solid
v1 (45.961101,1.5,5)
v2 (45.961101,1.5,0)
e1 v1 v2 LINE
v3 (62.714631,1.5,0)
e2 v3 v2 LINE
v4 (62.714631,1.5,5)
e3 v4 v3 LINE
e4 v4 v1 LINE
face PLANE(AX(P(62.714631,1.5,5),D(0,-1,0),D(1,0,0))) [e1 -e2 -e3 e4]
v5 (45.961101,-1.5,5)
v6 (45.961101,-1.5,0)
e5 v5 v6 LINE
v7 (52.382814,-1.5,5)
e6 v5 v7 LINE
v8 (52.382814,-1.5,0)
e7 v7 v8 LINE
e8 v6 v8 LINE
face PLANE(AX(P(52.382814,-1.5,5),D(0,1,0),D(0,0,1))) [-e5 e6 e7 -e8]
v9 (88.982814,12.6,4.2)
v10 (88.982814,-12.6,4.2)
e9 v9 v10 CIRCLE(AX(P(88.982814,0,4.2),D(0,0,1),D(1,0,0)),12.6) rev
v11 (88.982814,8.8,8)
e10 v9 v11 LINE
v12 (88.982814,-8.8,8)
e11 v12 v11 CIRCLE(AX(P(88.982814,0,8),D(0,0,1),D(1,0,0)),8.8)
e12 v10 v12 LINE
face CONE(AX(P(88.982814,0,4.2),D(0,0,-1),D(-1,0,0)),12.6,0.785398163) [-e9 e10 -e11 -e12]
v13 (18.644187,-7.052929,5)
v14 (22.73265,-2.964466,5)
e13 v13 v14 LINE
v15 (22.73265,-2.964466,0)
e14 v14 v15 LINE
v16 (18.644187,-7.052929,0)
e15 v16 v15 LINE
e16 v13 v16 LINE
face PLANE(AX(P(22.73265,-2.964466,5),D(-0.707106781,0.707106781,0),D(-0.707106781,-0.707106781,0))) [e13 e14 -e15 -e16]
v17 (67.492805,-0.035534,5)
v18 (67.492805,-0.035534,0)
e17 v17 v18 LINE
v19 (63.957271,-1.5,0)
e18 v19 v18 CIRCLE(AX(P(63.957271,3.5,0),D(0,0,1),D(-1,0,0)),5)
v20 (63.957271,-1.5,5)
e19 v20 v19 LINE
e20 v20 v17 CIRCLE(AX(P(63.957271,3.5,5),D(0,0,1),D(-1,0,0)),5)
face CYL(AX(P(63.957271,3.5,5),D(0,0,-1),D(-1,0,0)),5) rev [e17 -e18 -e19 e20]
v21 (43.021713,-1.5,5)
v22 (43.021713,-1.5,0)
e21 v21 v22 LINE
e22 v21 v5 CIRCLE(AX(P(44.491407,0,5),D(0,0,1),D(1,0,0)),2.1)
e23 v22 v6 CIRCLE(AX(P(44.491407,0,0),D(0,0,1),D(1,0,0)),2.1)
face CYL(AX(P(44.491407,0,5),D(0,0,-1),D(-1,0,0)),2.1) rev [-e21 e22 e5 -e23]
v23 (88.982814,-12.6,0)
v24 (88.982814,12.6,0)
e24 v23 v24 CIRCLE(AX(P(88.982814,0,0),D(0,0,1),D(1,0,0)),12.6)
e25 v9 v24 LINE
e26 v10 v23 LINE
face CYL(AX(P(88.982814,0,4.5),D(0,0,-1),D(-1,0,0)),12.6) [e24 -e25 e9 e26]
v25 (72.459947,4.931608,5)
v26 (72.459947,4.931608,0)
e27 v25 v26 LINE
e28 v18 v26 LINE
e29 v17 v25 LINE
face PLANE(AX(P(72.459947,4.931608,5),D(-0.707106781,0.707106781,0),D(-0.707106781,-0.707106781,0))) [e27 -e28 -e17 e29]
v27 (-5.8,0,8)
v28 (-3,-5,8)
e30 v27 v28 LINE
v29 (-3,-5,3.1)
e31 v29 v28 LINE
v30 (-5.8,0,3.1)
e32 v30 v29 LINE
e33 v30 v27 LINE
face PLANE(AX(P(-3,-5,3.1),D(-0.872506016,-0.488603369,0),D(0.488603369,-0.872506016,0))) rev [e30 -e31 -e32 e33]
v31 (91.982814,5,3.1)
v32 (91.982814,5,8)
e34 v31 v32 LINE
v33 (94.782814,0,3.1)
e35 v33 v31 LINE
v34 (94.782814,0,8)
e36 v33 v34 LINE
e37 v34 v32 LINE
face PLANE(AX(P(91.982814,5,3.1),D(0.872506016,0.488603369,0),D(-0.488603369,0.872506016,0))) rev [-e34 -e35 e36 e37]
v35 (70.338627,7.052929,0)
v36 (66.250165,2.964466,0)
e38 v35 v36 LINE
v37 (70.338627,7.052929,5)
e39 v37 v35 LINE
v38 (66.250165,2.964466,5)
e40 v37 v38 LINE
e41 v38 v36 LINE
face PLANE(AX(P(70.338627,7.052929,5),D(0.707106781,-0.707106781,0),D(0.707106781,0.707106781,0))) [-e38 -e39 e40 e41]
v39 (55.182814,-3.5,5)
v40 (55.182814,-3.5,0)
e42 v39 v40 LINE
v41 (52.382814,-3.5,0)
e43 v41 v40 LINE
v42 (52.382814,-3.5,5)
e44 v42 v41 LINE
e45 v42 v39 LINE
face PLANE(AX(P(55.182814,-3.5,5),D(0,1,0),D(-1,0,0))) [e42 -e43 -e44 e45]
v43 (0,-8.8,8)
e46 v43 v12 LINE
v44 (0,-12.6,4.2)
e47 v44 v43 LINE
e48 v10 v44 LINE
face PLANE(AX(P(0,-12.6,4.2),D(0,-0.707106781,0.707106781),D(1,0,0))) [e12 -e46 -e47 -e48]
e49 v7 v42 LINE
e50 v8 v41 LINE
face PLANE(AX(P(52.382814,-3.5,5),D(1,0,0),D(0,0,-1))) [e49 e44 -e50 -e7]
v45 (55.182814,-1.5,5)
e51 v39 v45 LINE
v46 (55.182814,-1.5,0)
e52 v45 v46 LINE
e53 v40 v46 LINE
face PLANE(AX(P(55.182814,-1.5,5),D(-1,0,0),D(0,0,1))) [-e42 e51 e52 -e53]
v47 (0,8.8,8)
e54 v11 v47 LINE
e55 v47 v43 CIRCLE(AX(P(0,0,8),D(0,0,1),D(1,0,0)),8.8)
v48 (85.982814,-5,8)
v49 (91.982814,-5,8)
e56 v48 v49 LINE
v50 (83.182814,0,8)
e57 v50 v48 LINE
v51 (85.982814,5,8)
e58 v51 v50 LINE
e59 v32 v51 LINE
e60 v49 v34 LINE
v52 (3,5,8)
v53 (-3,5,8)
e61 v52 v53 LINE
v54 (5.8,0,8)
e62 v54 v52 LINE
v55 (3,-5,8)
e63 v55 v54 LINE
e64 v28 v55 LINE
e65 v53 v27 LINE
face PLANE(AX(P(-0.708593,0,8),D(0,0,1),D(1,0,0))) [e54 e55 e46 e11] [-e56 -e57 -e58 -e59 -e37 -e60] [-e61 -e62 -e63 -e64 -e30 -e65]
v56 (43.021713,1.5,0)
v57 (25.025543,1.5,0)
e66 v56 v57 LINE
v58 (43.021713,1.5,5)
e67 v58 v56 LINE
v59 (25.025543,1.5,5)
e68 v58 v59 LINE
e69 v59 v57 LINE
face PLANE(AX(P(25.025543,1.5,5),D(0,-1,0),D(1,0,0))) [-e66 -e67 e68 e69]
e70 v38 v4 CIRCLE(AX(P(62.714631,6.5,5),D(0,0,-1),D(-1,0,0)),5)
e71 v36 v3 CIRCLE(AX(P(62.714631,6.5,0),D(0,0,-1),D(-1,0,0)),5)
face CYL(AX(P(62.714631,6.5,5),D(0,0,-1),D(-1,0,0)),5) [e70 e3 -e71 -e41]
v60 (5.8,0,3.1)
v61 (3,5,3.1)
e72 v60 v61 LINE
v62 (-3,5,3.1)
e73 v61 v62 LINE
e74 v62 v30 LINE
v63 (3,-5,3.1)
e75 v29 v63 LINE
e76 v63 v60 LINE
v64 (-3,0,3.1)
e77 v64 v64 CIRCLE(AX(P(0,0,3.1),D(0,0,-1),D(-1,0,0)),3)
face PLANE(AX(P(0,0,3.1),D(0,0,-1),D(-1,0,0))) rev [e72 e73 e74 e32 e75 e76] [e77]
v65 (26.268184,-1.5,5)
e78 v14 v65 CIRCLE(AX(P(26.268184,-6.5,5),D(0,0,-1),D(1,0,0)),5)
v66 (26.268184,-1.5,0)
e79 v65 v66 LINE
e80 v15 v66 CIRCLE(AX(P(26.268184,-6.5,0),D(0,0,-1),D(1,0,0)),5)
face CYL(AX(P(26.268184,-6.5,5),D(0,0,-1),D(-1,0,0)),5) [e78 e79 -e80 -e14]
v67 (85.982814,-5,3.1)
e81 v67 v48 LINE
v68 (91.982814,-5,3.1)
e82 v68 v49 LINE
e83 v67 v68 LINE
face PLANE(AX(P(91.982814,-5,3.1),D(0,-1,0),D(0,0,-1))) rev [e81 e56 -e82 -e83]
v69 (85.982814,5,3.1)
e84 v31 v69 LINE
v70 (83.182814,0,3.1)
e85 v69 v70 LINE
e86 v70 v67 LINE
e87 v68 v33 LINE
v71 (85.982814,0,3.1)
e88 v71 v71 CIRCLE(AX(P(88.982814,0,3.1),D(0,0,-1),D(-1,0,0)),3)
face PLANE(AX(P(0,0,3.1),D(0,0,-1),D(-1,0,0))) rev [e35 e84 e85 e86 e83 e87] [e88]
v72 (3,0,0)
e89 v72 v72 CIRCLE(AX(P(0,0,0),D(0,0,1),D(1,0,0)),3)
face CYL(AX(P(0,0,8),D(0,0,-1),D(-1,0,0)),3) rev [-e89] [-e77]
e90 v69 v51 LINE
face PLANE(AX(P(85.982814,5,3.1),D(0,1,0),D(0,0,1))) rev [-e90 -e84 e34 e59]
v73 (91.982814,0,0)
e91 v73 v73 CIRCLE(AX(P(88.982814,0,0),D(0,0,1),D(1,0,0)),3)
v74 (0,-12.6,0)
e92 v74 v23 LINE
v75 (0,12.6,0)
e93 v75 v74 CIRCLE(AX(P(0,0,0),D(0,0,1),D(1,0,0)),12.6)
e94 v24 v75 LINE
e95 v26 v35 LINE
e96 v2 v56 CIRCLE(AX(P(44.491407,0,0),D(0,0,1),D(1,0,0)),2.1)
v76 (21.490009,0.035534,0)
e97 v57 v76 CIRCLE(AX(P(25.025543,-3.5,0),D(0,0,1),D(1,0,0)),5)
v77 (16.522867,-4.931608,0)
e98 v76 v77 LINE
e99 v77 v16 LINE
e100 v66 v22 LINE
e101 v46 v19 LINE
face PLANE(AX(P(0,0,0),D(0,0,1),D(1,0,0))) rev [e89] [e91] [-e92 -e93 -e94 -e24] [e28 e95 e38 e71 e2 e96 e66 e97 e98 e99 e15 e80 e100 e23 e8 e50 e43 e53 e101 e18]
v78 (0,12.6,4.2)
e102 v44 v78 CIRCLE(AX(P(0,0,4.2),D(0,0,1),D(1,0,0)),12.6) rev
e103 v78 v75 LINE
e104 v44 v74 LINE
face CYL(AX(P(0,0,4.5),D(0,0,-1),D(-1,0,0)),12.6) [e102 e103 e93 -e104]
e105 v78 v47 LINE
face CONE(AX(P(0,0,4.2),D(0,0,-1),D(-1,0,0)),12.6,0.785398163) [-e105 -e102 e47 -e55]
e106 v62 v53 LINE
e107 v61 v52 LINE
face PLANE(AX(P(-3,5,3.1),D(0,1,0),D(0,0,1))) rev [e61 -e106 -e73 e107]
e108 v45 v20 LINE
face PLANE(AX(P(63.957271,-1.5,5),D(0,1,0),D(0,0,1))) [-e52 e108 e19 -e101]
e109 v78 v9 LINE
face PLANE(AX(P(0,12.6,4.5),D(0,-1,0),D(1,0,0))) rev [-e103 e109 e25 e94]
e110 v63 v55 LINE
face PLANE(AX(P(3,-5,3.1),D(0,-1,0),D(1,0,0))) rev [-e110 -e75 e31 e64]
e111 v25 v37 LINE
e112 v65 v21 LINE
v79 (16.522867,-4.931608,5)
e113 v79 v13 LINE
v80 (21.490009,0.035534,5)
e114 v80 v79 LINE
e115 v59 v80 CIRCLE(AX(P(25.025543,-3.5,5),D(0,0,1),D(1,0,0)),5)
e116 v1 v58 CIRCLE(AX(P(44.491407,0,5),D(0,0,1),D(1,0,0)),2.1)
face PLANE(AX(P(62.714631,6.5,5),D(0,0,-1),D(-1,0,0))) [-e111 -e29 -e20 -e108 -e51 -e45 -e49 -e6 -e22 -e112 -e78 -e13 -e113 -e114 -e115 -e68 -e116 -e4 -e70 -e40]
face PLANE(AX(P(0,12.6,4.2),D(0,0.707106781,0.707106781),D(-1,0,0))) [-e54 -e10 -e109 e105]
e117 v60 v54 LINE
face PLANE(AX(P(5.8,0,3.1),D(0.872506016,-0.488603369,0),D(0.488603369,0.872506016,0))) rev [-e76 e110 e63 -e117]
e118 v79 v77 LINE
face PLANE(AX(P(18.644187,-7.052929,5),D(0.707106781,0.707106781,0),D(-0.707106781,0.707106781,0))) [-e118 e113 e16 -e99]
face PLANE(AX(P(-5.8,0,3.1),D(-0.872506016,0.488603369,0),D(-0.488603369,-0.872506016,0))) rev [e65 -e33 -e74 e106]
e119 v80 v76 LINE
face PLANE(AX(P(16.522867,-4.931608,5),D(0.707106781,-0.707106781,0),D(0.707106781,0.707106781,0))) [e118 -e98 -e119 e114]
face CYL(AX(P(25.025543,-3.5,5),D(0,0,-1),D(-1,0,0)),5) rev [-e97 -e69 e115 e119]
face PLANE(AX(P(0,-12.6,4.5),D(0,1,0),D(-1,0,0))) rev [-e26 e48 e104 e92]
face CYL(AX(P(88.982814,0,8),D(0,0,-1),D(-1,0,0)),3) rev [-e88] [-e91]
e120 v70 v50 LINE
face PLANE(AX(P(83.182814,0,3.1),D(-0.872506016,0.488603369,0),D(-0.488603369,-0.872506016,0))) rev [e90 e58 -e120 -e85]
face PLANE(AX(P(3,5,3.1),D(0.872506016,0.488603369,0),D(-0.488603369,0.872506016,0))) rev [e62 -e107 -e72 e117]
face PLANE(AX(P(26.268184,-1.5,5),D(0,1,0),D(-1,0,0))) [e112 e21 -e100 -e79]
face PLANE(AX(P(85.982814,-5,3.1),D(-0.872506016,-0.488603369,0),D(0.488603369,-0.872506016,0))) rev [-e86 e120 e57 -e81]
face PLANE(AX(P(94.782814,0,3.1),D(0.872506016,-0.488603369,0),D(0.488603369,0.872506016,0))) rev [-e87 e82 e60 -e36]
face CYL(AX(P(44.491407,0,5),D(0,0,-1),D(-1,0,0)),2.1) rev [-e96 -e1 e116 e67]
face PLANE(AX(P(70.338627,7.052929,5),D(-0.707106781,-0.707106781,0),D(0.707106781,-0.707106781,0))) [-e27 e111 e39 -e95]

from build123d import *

# Parameters (mm, degrees)
BOSS_EXTRUDE1_DEPTH  = 4.5
BOSS_EXTRUDE2_DEPTH  = 4
CHAMFER2_2_DEPTH     = 4.2
CHAMFER2_START       = 4.2
CHAMFER2_3_OUTLINE_R = 8.8
CHAMFER2_3_DEPTH     = 3.8
SKETCH4_R            = 3
CUT_EXTRUDE1_DEPTH   = 103.673405573
CUT_EXTRUDE2_DEPTH   = 4.9
CUT_EXTRUDE3_DEPTH   = 5


with BuildPart() as part:
    # Sketch2 → Boss-Extrude1 (new body)
    with BuildSketch(Plane.XY):
        with BuildLine():
            Line((0, 12.6), (88.98281443, 12.6))
            ThreePointArc((88.98281443, 12.6), (101.58281443, 0), (88.98281443, -12.6))
            Line((88.98281443, -12.6), (0, -12.6))
            ThreePointArc((0, -12.6), (-12.6, 0), (0, 12.6))
        make_face()
    extrude(amount=BOSS_EXTRUDE1_DEPTH)

    # Sketch3 → Boss-Extrude2 (add)
    with BuildSketch(Plane.XY.offset(8)):
        with BuildLine():
            Line((-0.708592785, -8.85), (89.691407215, -8.85))
            ThreePointArc((89.691407215, -8.85), (98.541407215, 0), (89.691407215, 8.85))
            Line((89.691407215, 8.85), (-0.708592785, 8.85))
            ThreePointArc((-0.708592785, 8.85), (-9.558592785, 0), (-0.708592785, -8.85))
        make_face()
    extrude(amount=-BOSS_EXTRUDE2_DEPTH)

    # Chamfer2: read off the stored shape, not the designer's step
    # Chamfer2 outline → Chamfer2 (revolve)
    with BuildSketch(Plane(origin=(88.98281443, 0, 0), x_dir=(1, 0, 0), z_dir=(0, -1, 0))):
        Polygon((12.6, 4.2), (8.8, 8), (8.8, 4.2), align=None)
    revolve(axis=Axis((88.98281443, 0, 0), (0, 0, 1)))

    # Chamfer2 2 outline → Chamfer2 2 (add)
    with BuildSketch(Plane.XY):
        with BuildLine():
            ThreePointArc((0, 12.6), (-12.6, 0), (0, -12.6))
            Line((0, -12.6), (88.98281443, -12.6))
            ThreePointArc((88.98281443, -12.6), (101.58281443, 0), (88.98281443, 12.6))
            Line((88.98281443, 12.6), (0, 12.6))
        make_face()
    extrude(amount=CHAMFER2_2_DEPTH)

    # Chamfer2 3 outline → Chamfer2 3 (add)
    with BuildSketch(Plane.XY.offset(CHAMFER2_START)):
        with Locations((88.98281443, 0)):
            Circle(CHAMFER2_3_OUTLINE_R)
    extrude(amount=CHAMFER2_3_DEPTH)

    # Chamfer2 4: loft between two sections, ruled curve by curve
    chamfer2_4_from = [
        Edge.make_three_point_arc((0, -8.8, 8), (-6.222539674, -6.222539674, 8), (-8.8, 0, 8)),
        Edge.make_three_point_arc((-8.8, 0, 8), (-6.222539674, 6.222539674, 8), (0, 8.8, 8)),
        Edge.make_line((88.98281443, 8.8, 8), (0, 8.8, 8)),
        Edge.make_line((0, -8.8, 8), (88.98281443, -8.8, 8)),
        Edge.make_line((88.98281443, -8.8, 8), (88.98281443, 8.8, 8)),
    ]
    chamfer2_4_to = [
        Edge.make_three_point_arc((0, -12.6, 4.2), (-8.909545443, -8.909545443, 4.2), (-12.6, 0, 4.2)),
        Edge.make_three_point_arc((-12.6, 0, 4.2), (-8.909545443, 8.909545443, 4.2), (0, 12.6, 4.2)),
        Edge.make_line((88.98281443, 12.6, 4.2), (0, 12.6, 4.2)),
        Edge.make_line((0, -12.6, 4.2), (88.98281443, -12.6, 4.2)),
        Edge.make_line((88.98281443, -12.6, 4.2), (88.98281443, 12.6, 4.2)),
    ]
    chamfer2_4 = Solid(Shell([*[Face.make_surface_from_curves(chamfer2_4_from[k], chamfer2_4_to[k]) for k in range(5)], Face(Wire(chamfer2_4_from)), Face(Wire(chamfer2_4_to))]))
    add(chamfer2_4)

    # Sketch4 → Cut-Extrude1 (cut, through all)
    with BuildSketch(Plane.XY):
        with Locations((88.98281443, 0)):
            Circle(SKETCH4_R)
        Circle(SKETCH4_R)
    extrude(amount=CUT_EXTRUDE1_DEPTH, mode=Mode.SUBTRACT)

    # Sketch5 → Cut-Extrude2 (cut)
    with BuildSketch(Plane.XY.offset(8)):
        Polygon((3, -5), (-3, -5), (-5.8, 0), (-3, 5), (3, 5), (5.8, 0), align=None)
        Polygon((83.18281443, 0), (85.98281443, 5), (91.98281443, 5), (94.78281443, 0), (91.98281443, -5), (85.98281443, -5), align=None)
    extrude(amount=-CUT_EXTRUDE2_DEPTH, mode=Mode.SUBTRACT)

    # Sketch6 → Cut-Extrude3 (cut)
    with BuildSketch(Plane.XY):
        with BuildLine():
            Line((70.338627057, 7.052928589), (72.459947401, 4.931608246))
            Line((72.459947401, 4.931608246), (67.492805249, -0.035533906))
            ThreePointArc((67.492805249, -0.035533906), (65.870688505, -1.119397663), (63.957271343, -1.5))
            Line((63.957271343, -1.5), (55.182814215, -1.5))
            Line((55.182814215, -1.5), (55.182814215, -3.5))
            Line((55.182814215, -3.5), (52.382814215, -3.5))
            Line((52.382814215, -3.5), (52.382814215, -1.5))
            Line((52.382814215, -1.5), (45.961101061, -1.5))
            ThreePointArc((45.961101061, -1.5), (44.491407215, -2.1), (43.021713369, -1.5))
            Line((43.021713369, -1.5), (26.268183774, -1.5))
            ThreePointArc((26.268183774, -1.5), (24.354766612, -1.880602337), (22.732649868, -2.964466094))
            Line((22.732649868, -2.964466094), (18.644187373, -7.052928589))
            Line((18.644187373, -7.052928589), (16.522867029, -4.931608246))
            Line((16.522867029, -4.931608246), (21.490009181, 0.035533906))
            ThreePointArc((21.490009181, 0.035533906), (23.112125925, 1.119397663), (25.025543087, 1.5))
            Line((25.025543087, 1.5), (43.021713369, 1.5))
            ThreePointArc((43.021713369, 1.5), (44.491407215, 2.1), (45.961101061, 1.5))
            Line((45.961101061, 1.5), (62.714630656, 1.5))
            ThreePointArc((62.714630656, 1.5), (64.628047818, 1.880602337), (66.250164562, 2.964466094))
            Line((66.250164562, 2.964466094), (70.338627057, 7.052928589))
        make_face()
    extrude(amount=CUT_EXTRUDE3_DEPTH, mode=Mode.SUBTRACT)


solid = part.part
